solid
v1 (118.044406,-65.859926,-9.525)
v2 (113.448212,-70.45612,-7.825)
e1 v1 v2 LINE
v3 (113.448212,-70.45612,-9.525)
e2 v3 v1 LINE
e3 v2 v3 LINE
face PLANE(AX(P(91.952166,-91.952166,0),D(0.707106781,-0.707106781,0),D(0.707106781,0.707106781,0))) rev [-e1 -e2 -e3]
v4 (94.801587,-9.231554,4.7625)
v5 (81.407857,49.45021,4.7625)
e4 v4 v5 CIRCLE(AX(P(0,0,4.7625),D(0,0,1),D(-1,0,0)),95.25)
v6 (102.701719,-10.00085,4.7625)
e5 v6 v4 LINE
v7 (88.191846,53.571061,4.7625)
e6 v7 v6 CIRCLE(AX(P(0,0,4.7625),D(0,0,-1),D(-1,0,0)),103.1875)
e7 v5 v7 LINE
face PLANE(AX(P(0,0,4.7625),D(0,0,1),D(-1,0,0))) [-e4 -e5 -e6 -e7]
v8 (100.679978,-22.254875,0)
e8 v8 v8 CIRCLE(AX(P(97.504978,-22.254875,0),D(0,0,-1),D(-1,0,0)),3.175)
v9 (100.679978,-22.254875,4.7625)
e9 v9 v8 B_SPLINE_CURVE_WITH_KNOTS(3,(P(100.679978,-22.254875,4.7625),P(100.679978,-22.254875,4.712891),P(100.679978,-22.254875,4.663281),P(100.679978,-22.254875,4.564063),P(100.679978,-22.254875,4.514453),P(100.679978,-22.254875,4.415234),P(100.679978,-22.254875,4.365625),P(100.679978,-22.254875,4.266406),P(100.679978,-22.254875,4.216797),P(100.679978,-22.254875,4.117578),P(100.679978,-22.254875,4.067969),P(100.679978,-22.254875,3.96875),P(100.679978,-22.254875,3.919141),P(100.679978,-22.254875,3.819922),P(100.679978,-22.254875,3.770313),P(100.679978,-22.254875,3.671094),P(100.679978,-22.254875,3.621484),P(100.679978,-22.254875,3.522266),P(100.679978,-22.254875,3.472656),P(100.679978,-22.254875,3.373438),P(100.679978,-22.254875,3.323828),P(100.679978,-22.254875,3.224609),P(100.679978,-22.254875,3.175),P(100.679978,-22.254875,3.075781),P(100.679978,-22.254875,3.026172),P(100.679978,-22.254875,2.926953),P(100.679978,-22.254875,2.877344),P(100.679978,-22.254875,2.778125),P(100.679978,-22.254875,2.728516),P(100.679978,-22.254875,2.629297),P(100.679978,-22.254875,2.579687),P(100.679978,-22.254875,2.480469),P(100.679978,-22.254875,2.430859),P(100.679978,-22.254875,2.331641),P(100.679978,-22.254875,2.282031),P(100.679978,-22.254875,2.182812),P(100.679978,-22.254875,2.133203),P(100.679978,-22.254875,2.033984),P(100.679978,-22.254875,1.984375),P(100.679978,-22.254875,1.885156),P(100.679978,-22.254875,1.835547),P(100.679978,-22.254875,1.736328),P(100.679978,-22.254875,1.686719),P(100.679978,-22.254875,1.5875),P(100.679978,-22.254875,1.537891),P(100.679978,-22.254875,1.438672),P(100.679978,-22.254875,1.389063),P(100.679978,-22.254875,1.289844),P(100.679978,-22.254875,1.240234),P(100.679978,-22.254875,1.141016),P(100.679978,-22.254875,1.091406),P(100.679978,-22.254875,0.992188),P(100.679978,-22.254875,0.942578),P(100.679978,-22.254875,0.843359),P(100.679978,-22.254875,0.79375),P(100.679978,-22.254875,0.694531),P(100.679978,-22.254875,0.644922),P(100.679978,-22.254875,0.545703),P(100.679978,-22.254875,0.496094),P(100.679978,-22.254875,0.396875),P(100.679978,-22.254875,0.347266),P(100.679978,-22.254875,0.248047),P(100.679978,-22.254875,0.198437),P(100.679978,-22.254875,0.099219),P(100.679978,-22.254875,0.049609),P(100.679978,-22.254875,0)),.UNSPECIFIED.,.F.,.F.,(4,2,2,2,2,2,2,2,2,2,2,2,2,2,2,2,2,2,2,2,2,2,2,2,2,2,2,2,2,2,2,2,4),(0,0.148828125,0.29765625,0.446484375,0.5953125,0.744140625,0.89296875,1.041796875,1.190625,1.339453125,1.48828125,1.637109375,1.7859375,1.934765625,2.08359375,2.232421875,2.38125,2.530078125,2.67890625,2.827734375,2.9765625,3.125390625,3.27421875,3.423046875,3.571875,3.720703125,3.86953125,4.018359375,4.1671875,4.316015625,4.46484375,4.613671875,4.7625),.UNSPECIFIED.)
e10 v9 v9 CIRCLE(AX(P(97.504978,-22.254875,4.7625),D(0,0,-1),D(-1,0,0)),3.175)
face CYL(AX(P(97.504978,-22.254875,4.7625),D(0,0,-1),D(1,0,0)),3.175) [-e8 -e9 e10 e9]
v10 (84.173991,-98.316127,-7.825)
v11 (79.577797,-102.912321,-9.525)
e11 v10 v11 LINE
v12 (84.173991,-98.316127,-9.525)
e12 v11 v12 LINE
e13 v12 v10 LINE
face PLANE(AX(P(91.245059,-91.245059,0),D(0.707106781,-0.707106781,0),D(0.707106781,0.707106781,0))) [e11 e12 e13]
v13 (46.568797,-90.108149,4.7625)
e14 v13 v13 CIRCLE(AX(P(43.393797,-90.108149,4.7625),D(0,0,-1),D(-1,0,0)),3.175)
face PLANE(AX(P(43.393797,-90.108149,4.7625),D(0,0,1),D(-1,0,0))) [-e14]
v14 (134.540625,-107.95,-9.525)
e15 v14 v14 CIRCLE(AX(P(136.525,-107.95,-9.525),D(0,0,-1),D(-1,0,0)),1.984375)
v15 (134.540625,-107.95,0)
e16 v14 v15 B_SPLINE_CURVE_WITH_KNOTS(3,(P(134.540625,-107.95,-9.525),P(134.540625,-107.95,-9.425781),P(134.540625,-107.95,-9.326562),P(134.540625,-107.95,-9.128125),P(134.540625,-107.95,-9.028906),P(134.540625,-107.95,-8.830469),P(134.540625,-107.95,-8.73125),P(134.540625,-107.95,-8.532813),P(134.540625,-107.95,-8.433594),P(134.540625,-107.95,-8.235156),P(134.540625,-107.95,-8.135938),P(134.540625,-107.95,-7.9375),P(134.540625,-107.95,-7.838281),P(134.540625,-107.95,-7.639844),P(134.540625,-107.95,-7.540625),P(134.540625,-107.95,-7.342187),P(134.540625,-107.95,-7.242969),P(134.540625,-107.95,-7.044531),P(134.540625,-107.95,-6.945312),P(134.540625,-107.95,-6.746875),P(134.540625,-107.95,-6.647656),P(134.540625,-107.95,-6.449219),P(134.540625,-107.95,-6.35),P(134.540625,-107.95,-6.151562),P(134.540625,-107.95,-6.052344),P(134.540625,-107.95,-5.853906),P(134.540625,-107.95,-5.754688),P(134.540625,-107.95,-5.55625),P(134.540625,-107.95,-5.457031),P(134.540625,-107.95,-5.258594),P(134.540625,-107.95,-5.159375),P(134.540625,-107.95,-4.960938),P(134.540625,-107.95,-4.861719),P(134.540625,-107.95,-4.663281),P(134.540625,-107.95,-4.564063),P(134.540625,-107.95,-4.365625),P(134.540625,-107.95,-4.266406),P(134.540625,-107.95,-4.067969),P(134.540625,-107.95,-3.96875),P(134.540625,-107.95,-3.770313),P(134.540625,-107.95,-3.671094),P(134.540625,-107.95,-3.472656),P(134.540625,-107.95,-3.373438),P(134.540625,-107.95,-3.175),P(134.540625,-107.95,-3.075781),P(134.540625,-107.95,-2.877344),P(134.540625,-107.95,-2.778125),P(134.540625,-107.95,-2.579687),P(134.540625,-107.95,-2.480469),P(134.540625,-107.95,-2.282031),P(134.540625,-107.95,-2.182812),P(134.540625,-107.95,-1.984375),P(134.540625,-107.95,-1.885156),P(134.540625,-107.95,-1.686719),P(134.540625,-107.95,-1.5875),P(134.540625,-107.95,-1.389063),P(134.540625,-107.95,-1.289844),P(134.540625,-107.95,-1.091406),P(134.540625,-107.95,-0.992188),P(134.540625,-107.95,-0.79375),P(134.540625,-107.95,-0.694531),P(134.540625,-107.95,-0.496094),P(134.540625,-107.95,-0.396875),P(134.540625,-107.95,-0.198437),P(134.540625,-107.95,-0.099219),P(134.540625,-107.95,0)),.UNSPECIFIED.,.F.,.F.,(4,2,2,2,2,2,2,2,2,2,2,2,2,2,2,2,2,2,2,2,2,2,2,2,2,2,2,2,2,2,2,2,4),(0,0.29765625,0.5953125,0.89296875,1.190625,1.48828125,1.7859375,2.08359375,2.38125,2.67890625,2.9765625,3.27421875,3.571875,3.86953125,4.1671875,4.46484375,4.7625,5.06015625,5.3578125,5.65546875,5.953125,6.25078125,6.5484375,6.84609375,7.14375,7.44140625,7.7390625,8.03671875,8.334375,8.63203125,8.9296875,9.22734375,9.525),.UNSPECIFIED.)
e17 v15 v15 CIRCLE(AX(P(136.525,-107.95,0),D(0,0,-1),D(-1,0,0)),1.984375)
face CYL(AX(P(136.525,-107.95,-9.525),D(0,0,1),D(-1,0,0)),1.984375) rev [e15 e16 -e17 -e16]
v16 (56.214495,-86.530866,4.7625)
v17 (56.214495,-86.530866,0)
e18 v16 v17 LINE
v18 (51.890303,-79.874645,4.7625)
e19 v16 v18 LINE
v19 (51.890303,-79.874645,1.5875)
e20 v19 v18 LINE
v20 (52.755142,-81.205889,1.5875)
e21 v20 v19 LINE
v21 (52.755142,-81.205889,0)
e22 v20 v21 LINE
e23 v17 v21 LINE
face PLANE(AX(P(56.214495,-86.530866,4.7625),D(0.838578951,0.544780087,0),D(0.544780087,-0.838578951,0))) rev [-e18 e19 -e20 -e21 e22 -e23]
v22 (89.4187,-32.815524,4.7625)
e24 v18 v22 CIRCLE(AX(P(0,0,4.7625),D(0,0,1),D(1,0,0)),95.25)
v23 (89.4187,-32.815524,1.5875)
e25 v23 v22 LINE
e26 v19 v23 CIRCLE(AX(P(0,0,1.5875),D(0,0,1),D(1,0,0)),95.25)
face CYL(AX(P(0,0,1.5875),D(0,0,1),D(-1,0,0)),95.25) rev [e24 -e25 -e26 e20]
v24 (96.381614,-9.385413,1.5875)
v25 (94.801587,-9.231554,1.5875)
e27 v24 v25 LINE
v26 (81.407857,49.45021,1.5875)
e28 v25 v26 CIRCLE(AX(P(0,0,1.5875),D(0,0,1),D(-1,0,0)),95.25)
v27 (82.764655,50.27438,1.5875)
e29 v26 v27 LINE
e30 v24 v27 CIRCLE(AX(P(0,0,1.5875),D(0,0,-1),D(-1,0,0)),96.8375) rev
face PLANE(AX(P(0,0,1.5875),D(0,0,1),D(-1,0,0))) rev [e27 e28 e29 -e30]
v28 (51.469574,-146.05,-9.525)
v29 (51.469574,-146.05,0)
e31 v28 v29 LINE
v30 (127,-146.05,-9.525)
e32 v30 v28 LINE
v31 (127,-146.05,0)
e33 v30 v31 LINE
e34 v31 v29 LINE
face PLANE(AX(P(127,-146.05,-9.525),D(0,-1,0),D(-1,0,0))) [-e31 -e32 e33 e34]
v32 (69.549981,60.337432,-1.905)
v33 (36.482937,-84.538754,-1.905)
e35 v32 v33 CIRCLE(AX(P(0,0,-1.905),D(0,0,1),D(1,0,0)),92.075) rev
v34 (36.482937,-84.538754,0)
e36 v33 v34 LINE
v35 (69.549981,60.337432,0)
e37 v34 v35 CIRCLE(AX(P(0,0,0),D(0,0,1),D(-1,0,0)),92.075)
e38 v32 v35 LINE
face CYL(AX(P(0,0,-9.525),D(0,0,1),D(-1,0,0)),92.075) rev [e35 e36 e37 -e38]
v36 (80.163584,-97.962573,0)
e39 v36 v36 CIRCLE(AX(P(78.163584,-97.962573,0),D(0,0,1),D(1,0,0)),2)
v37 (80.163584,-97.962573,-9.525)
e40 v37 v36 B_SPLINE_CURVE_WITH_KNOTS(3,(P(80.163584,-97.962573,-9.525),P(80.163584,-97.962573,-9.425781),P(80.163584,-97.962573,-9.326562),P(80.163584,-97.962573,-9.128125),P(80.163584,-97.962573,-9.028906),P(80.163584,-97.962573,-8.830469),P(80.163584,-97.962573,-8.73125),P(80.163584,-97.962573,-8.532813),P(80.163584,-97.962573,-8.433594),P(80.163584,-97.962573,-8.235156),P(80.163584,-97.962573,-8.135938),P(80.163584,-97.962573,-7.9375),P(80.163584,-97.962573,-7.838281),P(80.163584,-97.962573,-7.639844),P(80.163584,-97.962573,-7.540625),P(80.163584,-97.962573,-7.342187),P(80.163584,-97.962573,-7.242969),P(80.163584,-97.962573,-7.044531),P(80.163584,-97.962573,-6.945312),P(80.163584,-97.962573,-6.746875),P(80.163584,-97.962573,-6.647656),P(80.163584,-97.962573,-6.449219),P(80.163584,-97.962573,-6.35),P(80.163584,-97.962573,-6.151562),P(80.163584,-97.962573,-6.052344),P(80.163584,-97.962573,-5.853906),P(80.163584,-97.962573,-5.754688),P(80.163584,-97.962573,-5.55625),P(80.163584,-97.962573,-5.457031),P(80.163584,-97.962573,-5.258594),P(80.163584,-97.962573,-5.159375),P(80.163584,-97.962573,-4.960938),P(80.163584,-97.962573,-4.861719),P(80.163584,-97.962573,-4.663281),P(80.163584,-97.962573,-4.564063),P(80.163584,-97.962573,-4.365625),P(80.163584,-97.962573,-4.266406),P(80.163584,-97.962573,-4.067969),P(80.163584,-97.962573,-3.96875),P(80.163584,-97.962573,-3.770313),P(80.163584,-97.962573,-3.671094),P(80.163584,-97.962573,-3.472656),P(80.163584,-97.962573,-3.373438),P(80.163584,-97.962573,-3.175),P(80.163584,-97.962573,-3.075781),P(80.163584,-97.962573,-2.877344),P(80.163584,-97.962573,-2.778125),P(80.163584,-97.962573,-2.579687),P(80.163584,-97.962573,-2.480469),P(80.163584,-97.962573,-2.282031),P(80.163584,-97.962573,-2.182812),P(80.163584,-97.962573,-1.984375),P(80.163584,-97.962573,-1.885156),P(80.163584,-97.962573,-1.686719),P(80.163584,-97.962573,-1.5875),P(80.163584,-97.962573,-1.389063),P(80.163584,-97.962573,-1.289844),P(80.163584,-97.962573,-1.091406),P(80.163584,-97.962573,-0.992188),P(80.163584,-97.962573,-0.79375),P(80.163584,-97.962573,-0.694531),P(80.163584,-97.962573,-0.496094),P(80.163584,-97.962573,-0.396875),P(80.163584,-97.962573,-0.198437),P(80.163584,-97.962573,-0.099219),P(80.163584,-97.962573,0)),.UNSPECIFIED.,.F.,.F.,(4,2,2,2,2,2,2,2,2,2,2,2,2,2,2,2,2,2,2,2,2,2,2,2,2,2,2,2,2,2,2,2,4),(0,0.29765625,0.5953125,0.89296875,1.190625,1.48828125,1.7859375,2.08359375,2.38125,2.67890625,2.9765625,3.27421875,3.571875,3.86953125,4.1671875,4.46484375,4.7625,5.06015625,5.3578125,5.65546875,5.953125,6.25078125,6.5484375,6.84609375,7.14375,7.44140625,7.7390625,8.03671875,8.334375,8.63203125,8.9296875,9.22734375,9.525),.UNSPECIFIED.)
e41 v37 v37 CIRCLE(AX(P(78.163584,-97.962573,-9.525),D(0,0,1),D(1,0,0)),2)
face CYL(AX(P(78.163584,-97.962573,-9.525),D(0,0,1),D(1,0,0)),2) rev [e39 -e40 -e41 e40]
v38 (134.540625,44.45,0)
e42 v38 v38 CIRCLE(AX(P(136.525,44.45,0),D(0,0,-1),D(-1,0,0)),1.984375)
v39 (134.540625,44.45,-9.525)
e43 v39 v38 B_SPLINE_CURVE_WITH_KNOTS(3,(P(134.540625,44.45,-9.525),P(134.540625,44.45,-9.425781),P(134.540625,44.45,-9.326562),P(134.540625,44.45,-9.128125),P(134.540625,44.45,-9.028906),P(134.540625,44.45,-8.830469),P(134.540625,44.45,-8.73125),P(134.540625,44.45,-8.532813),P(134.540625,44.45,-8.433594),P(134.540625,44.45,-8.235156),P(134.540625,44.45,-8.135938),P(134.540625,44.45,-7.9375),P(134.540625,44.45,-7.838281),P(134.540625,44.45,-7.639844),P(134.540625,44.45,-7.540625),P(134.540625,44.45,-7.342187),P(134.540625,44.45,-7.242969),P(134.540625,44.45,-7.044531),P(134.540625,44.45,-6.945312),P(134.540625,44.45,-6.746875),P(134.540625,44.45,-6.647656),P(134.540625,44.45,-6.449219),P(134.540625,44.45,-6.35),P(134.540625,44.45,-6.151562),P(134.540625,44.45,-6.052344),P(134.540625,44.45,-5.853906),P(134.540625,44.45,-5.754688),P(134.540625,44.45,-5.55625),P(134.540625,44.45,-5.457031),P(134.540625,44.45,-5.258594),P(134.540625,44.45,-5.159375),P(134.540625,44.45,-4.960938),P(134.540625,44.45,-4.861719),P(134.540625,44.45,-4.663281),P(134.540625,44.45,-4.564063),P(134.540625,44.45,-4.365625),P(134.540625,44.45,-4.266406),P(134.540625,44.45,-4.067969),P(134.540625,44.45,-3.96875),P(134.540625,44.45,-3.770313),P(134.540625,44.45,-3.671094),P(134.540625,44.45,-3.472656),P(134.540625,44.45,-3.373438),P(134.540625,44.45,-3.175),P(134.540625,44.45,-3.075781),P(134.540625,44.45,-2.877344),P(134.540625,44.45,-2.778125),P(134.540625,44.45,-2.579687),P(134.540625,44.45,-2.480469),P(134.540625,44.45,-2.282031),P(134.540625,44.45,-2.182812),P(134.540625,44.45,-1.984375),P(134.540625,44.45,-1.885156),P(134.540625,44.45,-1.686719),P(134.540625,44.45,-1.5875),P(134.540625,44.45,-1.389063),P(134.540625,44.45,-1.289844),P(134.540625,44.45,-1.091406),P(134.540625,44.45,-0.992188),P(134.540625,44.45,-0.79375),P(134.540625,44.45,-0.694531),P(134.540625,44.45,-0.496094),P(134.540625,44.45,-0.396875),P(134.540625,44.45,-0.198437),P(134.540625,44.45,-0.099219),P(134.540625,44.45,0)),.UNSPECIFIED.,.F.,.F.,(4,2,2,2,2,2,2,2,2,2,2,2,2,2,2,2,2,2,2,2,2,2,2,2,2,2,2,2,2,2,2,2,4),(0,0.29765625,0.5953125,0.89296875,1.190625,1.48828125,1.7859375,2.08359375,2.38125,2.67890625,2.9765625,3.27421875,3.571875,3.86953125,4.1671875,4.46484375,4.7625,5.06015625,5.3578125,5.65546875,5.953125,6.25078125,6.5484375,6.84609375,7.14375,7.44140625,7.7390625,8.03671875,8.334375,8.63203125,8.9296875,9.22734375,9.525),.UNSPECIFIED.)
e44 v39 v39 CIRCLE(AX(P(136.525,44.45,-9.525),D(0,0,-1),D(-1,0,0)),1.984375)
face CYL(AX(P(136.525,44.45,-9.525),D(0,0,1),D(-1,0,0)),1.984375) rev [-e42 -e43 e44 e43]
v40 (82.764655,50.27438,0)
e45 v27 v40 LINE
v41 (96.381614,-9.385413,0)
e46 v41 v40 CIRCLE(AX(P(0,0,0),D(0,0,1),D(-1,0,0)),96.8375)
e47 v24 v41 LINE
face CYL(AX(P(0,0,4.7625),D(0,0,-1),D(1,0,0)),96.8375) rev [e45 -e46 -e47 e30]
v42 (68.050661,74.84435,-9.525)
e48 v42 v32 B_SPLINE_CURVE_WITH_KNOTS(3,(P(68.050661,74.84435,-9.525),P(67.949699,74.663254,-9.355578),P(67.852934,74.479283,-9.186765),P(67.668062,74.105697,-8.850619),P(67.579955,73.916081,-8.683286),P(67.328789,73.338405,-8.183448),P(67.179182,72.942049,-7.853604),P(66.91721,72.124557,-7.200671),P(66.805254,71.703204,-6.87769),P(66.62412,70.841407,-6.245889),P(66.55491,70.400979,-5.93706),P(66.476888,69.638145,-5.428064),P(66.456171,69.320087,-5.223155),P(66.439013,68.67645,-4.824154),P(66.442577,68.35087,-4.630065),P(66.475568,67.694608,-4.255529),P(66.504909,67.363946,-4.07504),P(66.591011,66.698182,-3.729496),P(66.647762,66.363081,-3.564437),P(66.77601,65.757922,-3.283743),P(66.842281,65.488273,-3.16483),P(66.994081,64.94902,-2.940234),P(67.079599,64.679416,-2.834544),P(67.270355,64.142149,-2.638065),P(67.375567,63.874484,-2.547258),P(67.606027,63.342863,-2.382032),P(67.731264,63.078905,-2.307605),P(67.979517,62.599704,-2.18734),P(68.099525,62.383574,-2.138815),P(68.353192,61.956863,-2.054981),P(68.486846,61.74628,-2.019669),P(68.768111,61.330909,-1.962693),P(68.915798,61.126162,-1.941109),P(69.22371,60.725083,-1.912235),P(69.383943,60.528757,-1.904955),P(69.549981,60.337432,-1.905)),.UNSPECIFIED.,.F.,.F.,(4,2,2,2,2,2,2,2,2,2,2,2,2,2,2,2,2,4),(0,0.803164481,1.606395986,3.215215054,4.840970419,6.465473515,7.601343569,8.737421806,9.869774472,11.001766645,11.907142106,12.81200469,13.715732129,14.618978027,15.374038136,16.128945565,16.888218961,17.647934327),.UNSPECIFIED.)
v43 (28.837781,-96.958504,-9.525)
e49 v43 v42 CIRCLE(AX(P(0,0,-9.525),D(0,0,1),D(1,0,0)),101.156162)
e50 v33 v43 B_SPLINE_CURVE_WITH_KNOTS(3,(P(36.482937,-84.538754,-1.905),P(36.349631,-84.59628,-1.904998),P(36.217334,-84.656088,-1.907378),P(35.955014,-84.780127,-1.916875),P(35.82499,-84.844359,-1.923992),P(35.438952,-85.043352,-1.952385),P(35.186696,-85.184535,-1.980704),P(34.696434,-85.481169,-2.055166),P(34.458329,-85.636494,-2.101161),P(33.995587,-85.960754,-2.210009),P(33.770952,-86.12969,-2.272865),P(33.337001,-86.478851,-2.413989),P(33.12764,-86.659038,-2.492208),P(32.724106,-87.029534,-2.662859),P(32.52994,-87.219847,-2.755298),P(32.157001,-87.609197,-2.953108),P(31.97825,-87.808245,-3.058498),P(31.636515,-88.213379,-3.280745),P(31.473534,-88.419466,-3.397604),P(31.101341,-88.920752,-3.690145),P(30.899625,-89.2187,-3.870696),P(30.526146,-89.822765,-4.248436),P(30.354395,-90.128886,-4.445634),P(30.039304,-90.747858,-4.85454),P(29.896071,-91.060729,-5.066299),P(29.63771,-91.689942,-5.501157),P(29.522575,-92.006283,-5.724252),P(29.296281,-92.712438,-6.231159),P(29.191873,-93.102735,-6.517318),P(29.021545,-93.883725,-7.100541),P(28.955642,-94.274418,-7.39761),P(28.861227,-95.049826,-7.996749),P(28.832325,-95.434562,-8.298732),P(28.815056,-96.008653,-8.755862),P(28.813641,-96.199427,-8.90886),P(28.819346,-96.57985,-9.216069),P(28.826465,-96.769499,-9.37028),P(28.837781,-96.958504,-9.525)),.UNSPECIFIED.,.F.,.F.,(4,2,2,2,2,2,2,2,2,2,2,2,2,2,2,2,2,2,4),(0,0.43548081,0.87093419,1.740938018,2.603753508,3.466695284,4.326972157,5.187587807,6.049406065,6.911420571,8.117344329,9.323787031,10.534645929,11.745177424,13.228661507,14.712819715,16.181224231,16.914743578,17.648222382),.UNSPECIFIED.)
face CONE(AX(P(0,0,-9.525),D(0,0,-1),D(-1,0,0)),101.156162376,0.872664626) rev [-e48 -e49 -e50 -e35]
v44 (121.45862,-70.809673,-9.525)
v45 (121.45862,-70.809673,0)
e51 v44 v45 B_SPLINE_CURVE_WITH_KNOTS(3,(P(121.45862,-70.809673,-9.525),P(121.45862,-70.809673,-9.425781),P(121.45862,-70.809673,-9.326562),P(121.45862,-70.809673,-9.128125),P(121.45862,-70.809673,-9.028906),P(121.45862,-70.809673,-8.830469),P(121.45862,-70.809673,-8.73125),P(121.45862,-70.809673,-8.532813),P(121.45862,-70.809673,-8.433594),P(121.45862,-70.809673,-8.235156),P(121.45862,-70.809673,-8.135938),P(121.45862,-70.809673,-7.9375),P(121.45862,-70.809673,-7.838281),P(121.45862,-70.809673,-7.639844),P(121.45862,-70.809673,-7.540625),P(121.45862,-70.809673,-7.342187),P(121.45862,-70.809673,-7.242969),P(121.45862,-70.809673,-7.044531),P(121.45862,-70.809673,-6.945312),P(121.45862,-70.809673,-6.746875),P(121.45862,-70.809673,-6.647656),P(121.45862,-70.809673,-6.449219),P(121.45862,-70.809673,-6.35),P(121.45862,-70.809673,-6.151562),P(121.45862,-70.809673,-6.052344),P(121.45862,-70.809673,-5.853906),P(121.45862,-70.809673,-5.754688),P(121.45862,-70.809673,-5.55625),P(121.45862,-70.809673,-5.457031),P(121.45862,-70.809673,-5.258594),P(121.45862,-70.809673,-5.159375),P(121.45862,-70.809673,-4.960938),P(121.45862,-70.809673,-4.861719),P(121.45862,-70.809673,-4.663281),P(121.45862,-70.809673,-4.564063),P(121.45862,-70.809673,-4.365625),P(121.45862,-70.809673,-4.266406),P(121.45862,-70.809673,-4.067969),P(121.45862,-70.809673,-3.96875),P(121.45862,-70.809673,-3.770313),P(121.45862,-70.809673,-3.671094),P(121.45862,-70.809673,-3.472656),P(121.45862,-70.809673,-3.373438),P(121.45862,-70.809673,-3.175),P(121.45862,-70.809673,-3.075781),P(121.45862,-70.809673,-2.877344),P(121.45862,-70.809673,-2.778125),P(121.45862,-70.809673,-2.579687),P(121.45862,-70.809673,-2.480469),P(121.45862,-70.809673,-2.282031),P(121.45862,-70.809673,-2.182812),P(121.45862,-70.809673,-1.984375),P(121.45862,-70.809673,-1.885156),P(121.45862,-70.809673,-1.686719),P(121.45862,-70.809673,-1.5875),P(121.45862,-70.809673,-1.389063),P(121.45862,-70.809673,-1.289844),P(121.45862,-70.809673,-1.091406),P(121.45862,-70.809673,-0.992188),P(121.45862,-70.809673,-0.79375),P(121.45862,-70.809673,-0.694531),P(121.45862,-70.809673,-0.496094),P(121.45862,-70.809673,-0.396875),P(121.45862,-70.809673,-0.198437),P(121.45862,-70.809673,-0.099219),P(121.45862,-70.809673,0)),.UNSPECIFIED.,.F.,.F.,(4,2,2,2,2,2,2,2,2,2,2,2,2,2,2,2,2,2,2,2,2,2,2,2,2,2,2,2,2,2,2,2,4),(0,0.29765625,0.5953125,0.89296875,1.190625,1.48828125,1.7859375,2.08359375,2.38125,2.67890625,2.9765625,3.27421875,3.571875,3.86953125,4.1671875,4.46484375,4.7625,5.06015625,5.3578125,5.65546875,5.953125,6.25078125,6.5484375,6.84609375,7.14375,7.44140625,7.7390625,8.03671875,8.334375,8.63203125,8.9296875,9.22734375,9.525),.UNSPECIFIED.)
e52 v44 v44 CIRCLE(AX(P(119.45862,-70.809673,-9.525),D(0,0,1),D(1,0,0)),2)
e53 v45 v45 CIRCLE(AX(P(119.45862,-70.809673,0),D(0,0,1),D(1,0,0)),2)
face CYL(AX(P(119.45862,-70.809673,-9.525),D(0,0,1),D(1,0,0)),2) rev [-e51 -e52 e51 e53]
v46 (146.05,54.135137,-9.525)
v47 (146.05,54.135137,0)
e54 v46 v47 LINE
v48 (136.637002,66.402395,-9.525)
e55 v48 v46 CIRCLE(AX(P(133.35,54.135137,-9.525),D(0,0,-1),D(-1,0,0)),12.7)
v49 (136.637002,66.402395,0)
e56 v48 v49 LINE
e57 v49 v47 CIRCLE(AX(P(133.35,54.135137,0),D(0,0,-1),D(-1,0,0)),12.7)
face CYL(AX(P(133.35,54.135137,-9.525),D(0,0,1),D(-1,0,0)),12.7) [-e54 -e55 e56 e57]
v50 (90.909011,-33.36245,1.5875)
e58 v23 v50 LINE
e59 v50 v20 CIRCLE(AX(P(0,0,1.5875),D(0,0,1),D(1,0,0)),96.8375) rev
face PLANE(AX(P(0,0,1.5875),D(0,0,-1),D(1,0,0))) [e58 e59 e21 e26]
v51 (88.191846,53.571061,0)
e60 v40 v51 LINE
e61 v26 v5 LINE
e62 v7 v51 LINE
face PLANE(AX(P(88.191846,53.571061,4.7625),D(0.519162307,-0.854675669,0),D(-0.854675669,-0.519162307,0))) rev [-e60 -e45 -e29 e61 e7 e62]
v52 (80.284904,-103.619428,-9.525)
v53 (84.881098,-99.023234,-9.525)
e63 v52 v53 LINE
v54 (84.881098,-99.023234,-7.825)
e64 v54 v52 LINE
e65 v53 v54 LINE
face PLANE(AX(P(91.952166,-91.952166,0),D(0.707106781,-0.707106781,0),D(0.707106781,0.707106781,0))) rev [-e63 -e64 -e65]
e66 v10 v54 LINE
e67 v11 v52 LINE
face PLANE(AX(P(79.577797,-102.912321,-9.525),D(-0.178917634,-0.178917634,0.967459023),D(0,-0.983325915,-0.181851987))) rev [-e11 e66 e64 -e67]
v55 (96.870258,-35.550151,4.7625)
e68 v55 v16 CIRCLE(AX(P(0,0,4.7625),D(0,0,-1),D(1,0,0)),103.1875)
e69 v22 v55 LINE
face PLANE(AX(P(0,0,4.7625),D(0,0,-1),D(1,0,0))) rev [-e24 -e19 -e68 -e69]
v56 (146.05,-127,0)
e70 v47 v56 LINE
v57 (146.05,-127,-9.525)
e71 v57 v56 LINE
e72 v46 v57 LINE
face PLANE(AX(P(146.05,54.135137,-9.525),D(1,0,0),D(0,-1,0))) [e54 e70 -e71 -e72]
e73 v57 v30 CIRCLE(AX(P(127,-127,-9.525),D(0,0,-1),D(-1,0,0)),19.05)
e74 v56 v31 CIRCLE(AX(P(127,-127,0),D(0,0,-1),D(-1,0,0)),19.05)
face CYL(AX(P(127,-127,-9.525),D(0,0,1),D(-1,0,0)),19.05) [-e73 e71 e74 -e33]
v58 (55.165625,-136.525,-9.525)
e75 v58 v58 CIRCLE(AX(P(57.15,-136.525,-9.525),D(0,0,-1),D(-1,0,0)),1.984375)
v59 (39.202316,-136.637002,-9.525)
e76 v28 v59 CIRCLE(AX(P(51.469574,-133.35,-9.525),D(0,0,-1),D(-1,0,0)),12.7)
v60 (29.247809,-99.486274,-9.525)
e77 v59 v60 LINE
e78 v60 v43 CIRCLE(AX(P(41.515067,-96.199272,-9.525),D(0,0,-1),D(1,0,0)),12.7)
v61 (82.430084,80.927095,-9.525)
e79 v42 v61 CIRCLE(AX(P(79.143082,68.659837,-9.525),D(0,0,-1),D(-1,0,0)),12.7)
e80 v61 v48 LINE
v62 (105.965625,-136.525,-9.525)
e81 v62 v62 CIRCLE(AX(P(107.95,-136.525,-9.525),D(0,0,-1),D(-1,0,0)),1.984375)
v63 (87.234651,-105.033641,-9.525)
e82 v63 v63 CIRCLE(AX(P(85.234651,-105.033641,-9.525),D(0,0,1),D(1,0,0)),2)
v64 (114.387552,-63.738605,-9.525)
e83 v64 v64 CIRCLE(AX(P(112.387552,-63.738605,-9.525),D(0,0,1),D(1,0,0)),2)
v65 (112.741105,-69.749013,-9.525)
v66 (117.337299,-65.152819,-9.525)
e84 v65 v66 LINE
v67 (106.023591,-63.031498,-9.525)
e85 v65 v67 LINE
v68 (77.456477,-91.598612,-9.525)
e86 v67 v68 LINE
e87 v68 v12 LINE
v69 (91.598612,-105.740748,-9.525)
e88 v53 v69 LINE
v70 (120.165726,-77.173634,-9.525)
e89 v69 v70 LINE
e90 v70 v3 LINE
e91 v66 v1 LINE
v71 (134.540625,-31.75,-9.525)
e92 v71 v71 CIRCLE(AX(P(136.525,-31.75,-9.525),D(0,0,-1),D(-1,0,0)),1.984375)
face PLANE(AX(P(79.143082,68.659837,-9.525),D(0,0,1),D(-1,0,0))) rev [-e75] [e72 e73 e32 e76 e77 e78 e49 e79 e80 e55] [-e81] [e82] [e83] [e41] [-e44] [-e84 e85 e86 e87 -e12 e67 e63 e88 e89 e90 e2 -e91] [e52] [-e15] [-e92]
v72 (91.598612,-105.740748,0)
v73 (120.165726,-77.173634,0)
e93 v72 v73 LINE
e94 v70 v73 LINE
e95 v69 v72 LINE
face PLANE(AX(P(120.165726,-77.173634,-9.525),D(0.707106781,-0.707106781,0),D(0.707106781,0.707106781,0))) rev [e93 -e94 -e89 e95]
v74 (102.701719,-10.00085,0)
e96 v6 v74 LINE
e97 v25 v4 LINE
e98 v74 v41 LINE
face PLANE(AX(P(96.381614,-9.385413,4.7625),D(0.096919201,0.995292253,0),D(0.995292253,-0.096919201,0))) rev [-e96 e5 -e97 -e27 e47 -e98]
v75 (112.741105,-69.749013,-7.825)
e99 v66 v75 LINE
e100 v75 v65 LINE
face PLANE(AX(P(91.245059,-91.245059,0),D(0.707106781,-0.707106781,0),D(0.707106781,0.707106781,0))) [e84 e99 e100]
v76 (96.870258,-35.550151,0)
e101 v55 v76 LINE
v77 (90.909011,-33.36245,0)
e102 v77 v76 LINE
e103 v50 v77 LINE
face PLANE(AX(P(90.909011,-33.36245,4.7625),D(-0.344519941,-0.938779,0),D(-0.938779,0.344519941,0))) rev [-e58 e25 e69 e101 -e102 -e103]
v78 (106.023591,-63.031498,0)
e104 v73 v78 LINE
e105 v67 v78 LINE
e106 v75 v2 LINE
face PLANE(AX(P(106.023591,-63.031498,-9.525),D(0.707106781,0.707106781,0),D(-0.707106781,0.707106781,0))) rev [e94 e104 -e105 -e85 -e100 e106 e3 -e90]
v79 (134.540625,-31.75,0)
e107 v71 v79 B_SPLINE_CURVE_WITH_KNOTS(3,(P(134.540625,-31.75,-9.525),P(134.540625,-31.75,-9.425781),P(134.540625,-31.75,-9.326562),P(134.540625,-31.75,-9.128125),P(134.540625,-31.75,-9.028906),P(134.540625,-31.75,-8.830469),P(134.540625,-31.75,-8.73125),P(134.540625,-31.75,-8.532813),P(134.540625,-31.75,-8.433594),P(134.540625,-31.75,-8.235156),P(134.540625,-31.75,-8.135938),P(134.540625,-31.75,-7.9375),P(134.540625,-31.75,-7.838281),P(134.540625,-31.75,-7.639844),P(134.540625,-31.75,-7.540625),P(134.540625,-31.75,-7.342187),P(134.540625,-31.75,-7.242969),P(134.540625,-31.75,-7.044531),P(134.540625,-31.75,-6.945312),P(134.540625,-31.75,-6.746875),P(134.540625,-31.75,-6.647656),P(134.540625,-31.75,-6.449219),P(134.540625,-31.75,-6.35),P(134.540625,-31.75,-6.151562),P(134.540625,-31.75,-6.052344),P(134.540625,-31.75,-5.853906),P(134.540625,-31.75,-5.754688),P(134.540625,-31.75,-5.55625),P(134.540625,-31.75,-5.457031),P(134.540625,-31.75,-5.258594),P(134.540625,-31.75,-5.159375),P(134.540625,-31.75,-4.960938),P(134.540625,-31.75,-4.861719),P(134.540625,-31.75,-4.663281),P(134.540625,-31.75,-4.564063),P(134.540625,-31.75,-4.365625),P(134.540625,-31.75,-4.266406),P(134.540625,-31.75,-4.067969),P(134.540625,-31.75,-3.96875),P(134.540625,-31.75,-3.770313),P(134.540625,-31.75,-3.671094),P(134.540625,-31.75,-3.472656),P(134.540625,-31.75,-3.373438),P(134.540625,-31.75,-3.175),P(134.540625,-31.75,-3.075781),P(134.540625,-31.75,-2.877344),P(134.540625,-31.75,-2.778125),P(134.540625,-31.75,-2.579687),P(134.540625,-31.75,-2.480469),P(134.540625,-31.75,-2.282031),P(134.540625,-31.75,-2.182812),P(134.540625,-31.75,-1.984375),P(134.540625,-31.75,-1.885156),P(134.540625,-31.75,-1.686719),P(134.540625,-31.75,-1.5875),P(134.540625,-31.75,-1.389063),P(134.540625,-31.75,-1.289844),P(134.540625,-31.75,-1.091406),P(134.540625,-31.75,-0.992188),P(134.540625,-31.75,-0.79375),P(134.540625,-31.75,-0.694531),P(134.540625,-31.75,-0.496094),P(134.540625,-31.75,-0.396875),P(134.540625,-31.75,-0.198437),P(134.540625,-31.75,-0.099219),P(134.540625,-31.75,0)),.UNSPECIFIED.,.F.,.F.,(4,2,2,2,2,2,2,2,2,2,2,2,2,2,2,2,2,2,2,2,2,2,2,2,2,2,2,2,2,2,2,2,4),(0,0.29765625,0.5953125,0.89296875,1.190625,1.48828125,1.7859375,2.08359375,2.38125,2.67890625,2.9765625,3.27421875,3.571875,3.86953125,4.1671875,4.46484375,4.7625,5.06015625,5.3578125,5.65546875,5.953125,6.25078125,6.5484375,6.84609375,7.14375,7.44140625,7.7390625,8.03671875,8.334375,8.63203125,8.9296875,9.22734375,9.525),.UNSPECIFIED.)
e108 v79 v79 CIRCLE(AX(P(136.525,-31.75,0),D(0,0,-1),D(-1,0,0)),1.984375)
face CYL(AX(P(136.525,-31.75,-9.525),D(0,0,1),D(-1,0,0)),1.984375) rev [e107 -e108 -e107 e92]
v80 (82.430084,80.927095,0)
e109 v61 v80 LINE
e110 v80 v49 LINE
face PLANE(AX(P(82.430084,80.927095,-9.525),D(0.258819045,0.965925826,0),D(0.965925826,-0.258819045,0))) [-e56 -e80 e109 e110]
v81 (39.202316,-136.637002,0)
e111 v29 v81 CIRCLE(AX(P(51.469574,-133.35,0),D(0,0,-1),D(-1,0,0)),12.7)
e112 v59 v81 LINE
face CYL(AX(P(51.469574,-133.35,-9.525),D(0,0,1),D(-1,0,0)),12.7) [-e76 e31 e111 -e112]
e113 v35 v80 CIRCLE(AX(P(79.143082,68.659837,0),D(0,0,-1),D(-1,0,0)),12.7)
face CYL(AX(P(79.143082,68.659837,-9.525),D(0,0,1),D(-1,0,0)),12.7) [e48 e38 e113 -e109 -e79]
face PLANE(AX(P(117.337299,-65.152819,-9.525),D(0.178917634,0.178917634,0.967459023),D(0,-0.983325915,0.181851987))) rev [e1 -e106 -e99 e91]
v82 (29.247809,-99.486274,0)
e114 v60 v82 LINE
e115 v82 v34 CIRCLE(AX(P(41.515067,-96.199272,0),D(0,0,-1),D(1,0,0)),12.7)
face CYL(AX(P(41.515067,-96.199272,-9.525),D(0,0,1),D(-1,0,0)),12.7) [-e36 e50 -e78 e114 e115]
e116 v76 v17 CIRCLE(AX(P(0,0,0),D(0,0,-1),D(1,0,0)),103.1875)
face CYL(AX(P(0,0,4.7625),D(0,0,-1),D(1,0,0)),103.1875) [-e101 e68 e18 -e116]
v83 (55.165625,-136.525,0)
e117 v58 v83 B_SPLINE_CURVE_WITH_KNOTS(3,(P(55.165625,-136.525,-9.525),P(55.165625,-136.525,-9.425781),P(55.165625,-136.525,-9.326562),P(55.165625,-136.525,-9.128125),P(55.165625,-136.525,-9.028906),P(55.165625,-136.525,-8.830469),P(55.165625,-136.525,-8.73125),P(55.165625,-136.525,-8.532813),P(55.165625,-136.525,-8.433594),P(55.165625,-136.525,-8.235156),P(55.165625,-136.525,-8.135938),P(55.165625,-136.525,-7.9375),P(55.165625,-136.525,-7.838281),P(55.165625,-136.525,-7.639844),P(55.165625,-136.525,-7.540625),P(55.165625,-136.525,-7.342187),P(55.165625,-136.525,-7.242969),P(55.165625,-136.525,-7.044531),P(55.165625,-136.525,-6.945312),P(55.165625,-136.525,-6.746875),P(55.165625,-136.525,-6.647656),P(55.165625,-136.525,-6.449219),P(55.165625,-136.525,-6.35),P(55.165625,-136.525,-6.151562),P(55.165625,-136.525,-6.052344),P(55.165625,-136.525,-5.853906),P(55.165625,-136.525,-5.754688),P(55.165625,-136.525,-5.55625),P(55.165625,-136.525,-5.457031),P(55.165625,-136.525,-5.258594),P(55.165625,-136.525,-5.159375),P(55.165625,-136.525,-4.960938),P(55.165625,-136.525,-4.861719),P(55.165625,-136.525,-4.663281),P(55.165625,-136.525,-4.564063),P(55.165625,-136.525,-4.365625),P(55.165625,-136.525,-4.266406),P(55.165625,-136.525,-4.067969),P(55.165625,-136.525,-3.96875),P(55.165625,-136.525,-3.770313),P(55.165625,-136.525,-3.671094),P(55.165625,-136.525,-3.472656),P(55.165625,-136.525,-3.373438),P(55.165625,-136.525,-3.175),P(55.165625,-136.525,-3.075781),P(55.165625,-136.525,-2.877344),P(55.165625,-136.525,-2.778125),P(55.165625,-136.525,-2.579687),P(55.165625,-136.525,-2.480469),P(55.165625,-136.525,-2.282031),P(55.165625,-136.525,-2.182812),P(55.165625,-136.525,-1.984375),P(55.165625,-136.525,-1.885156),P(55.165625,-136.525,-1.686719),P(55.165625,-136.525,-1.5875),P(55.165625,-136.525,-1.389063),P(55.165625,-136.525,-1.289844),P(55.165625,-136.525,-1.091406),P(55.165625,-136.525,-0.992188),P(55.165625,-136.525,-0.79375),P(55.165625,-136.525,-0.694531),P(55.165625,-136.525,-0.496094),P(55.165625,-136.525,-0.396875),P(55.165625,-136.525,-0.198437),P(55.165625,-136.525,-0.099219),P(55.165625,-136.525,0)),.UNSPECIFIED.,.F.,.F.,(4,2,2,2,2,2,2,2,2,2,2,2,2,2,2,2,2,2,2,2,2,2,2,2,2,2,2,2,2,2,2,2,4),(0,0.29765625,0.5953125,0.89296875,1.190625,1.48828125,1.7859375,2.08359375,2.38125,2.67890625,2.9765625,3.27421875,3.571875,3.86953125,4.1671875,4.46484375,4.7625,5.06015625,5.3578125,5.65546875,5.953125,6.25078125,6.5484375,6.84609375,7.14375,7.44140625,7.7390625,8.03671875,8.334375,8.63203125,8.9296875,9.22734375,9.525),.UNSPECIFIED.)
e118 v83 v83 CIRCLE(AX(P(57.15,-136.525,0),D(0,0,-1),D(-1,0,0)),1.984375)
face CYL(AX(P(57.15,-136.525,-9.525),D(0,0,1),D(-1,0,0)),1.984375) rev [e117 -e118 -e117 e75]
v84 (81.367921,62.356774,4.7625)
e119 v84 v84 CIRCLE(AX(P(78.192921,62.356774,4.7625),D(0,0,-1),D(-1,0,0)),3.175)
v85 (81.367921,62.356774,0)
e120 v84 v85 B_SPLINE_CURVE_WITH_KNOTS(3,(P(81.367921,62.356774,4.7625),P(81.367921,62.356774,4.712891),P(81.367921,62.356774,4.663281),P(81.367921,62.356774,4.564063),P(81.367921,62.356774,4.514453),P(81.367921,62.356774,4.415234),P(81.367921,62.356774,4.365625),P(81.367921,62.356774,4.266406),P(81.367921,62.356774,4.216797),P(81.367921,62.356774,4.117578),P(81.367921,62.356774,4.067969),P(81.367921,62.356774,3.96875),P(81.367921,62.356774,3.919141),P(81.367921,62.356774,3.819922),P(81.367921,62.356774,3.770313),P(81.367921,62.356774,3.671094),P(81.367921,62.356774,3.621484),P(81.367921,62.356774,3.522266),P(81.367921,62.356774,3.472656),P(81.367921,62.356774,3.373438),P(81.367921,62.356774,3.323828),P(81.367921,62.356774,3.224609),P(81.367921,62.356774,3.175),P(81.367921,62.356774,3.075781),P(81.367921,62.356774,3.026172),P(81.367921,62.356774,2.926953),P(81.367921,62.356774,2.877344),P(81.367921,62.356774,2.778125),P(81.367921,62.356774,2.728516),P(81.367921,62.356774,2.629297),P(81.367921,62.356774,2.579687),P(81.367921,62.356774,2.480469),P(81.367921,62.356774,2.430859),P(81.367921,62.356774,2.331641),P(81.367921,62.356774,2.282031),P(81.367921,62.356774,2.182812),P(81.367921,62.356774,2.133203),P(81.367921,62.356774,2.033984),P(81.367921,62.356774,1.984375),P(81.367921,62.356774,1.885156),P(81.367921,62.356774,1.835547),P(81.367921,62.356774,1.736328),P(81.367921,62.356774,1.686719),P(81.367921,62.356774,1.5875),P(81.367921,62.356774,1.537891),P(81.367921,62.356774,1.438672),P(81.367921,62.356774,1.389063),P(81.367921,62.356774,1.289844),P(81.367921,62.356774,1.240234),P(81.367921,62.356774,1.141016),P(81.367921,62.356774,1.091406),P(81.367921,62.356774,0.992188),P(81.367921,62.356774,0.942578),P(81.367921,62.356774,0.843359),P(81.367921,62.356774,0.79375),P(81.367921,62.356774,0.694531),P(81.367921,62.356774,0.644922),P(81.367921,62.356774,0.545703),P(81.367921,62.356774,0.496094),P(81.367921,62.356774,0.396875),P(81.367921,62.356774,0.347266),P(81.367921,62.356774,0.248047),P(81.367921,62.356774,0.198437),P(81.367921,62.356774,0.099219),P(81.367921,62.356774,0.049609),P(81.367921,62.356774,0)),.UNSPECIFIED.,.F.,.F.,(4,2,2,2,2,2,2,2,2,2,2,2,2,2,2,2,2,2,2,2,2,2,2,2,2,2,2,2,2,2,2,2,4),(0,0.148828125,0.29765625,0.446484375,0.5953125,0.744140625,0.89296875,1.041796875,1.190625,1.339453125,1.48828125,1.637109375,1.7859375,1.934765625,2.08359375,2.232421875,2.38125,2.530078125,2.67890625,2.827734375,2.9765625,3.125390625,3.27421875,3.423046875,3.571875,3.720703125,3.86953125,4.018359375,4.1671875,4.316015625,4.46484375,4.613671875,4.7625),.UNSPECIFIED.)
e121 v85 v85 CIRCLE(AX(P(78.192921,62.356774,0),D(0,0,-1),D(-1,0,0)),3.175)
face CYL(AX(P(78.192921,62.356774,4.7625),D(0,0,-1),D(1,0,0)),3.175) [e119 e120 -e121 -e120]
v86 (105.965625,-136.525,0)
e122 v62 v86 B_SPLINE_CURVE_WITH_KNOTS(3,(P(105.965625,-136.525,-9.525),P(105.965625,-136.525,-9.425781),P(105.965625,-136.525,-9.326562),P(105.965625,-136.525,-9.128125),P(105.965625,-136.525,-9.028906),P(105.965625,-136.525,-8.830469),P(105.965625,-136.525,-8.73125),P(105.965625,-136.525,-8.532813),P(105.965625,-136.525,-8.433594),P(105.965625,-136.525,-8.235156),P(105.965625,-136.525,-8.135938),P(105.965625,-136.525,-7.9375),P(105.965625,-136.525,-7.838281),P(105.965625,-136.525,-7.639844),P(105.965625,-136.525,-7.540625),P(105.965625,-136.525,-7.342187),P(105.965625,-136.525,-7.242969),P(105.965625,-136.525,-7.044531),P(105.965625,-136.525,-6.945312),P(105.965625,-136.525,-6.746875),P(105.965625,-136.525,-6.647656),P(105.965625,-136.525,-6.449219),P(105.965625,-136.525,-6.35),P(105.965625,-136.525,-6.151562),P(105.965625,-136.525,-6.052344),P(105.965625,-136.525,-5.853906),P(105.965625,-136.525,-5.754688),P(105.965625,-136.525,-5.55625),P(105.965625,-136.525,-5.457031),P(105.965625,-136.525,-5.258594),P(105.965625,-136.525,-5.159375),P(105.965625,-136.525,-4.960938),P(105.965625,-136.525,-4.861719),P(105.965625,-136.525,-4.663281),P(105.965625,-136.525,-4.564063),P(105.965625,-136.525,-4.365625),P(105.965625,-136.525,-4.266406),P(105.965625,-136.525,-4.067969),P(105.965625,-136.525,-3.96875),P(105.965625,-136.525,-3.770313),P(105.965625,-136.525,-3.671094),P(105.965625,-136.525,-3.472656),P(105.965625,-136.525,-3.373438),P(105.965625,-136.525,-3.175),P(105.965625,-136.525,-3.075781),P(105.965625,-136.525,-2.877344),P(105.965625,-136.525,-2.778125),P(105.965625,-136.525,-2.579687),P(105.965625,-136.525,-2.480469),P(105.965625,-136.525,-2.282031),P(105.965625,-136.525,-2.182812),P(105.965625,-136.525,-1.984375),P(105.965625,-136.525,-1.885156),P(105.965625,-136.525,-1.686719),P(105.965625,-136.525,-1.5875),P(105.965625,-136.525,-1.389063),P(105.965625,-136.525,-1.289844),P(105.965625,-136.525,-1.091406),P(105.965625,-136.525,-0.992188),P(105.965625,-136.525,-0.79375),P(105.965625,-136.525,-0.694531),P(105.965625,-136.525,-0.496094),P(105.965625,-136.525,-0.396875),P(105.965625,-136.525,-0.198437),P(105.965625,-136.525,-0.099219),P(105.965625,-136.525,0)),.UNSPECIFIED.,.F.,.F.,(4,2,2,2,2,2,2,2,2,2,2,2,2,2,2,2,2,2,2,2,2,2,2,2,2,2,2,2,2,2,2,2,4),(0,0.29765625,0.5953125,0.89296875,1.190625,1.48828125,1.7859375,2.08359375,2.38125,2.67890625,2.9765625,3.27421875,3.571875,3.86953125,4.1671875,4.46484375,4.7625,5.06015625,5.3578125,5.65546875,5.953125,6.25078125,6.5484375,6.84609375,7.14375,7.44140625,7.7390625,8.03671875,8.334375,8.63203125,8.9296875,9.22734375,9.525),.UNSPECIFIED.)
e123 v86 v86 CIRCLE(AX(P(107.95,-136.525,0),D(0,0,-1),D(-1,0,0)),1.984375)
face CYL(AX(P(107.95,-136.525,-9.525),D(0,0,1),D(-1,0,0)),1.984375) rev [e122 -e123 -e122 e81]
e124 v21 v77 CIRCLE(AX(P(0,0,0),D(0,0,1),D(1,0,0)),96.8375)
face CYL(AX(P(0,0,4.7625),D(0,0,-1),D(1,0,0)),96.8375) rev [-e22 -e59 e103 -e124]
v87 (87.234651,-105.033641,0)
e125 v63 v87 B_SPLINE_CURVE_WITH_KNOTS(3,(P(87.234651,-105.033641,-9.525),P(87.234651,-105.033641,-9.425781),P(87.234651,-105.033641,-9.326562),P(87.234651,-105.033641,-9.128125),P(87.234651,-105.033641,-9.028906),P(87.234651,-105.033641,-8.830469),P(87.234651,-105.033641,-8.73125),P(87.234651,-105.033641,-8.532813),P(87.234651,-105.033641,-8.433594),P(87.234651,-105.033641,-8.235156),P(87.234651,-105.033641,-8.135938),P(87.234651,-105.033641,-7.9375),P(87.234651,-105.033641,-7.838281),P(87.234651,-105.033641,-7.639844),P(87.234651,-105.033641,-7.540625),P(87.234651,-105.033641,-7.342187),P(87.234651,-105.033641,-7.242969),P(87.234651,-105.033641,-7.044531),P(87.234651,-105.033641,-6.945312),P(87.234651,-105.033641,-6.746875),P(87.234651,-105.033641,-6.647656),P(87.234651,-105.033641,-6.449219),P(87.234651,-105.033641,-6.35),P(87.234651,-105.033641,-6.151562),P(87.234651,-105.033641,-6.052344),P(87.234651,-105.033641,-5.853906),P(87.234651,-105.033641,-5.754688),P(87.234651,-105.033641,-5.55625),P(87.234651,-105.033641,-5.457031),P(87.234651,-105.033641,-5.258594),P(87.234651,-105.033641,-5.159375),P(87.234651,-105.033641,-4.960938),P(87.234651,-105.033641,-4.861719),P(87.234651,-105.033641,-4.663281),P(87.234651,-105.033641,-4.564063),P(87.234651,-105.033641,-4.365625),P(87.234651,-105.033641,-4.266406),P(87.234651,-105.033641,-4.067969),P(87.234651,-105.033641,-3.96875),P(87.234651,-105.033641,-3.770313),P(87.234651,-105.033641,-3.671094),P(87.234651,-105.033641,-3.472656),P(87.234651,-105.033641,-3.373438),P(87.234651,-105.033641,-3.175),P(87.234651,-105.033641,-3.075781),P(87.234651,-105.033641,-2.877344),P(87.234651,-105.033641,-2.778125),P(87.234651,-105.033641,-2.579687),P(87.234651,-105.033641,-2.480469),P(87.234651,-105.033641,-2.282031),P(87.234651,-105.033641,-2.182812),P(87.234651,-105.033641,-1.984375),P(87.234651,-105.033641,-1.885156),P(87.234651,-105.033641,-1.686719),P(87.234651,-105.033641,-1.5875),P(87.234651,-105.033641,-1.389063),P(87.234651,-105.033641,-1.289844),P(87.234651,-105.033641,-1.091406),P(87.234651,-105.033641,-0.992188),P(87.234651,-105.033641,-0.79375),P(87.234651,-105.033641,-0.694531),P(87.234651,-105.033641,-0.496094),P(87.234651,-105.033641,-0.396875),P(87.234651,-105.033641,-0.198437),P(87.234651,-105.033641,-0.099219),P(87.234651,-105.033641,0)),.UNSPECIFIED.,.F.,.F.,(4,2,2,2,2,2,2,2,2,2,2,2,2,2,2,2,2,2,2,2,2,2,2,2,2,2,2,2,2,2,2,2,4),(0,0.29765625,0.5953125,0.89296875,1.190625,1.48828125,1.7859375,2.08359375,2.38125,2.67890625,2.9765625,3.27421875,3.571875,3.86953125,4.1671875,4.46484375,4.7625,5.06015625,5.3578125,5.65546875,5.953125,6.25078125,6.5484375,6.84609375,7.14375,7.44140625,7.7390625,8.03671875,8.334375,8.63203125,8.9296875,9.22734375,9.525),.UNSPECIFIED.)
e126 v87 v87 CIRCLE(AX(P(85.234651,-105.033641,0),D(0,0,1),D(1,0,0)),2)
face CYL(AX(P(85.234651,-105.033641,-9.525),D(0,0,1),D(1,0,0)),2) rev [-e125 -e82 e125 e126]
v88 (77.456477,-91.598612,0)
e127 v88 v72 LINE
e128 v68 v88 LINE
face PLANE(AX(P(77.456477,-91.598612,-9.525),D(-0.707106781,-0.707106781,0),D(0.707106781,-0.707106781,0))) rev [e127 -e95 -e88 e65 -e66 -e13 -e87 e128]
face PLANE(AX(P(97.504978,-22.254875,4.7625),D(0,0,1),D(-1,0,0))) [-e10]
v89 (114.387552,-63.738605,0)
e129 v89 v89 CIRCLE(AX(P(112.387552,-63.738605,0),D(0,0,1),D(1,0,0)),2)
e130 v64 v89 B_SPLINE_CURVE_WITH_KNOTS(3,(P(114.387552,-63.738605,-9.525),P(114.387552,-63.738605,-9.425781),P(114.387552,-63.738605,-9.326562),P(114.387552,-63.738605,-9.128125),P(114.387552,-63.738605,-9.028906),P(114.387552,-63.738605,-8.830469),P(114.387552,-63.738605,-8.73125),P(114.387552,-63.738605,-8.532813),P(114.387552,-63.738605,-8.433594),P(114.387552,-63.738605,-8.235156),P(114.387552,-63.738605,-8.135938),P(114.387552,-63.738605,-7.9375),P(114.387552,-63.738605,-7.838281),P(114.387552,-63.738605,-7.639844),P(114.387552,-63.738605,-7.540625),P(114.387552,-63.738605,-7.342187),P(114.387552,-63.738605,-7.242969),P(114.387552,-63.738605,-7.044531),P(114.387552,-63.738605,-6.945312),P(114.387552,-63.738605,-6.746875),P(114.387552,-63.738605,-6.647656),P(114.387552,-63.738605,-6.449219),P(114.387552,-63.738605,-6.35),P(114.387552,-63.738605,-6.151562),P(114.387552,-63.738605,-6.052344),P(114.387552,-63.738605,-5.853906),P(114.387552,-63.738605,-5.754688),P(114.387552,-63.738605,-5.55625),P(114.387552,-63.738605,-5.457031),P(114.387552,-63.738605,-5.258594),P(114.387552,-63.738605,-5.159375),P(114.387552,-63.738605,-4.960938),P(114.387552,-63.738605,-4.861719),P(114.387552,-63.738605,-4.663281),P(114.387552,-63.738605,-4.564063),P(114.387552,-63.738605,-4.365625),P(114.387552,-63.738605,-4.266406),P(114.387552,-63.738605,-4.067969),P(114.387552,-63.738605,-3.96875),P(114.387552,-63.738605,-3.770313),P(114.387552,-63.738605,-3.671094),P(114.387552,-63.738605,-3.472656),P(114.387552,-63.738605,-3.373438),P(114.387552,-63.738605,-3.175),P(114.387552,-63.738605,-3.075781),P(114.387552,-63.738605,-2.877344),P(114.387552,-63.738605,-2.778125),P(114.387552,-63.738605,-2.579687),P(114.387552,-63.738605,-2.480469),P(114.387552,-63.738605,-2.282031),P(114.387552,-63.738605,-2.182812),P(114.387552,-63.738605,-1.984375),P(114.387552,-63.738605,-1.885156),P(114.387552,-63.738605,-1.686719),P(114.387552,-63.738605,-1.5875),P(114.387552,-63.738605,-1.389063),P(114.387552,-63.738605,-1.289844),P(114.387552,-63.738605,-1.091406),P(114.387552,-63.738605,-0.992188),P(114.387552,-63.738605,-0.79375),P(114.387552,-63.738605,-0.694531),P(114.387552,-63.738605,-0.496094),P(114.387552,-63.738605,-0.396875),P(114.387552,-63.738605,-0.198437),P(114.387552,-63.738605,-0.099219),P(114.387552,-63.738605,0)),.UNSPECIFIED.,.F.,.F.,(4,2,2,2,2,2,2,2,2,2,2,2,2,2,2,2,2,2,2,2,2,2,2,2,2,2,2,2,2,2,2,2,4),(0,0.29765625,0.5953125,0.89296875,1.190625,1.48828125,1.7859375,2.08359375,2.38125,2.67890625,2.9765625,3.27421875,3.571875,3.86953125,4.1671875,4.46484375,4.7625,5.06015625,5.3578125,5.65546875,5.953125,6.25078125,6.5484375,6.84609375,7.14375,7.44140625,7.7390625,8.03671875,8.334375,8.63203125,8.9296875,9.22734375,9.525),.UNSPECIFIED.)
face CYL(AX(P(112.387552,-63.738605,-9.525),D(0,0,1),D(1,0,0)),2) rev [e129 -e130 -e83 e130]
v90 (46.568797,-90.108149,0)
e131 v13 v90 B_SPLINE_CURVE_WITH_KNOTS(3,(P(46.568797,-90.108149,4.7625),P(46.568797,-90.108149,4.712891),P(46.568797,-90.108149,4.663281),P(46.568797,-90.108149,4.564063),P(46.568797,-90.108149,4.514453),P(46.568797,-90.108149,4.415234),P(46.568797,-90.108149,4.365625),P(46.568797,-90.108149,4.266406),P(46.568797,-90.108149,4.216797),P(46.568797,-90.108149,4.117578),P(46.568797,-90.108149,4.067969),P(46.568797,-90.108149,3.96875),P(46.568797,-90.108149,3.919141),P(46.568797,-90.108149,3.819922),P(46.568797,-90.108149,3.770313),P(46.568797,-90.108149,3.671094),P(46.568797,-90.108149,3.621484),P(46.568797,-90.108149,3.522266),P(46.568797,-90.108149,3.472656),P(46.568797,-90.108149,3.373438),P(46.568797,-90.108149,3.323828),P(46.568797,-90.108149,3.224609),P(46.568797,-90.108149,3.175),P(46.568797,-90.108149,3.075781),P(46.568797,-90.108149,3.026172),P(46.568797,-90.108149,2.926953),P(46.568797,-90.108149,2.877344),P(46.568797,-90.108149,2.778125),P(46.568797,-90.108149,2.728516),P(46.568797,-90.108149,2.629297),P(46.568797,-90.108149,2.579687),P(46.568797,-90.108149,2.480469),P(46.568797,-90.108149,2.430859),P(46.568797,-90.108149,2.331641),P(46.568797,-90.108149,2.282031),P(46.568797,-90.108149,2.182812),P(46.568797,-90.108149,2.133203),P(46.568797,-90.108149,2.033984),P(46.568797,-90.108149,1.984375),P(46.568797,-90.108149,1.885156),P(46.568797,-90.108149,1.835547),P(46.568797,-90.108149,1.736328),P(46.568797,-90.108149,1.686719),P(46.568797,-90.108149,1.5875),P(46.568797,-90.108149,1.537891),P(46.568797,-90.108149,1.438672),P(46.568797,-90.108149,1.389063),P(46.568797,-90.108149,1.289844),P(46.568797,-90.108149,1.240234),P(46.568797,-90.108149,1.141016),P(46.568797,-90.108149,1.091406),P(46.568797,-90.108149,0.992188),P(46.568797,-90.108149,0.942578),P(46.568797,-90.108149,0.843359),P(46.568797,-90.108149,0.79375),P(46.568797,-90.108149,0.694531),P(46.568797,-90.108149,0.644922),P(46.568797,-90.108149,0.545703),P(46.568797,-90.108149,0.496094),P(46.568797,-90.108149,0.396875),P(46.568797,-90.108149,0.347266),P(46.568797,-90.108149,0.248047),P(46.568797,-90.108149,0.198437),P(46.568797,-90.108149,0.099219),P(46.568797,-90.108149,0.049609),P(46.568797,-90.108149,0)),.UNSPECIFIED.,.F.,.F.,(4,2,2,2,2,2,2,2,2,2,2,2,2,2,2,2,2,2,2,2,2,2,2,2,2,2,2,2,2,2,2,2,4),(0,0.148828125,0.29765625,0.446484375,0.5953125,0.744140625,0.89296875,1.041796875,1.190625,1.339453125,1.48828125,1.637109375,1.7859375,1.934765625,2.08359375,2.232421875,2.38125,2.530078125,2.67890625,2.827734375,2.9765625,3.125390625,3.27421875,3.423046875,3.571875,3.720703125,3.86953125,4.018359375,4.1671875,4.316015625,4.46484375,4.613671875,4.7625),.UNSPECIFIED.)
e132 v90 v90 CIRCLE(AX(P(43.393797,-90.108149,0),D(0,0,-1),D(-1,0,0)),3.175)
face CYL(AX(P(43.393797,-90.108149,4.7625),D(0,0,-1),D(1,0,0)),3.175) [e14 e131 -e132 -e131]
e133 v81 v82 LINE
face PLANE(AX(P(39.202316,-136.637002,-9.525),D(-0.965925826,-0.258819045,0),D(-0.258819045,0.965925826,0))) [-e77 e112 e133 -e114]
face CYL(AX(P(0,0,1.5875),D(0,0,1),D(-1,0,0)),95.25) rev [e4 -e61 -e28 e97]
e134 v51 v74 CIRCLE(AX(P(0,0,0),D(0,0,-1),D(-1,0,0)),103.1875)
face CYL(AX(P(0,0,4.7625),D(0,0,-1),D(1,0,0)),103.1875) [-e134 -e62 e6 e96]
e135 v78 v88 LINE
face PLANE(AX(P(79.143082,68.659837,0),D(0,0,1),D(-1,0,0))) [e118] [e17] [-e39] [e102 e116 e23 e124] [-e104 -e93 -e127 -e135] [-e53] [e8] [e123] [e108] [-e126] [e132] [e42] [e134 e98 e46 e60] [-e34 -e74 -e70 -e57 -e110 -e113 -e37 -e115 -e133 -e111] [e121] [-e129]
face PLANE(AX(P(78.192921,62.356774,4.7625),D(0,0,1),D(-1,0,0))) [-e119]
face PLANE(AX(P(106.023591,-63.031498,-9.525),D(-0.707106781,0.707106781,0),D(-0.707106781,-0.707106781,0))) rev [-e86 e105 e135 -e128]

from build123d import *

# Parameters (mm, degrees)
SKETCH1_R             = 3.175
BOSS_EXTRUDE1_DEPTH   = 4.7625
BOSS_EXTRUDE1_2_DEPTH = 4.7625
BOSS_EXTRUDE1_3_DEPTH = 4.7625
BOSS_EXTRUDE1_4_DEPTH = 4.7625
BOSS_EXTRUDE1_5_DEPTH = 4.7625
SKETCH2_R             = 1.984375
BOSS_EXTRUDE2_DEPTH   = 9.525
BOSS_EXTRUDE3_DEPTH   = 3.175
SKETCH5_R             = 2
CUT_EXTRUDE1_DEPTH    = 207.765399971
CUT_EXTRUDE2_DEPTH    = 0.5
CHAMFER1_SIZE         = 7.62
CHAMFER1_SIZE_2       = 9.081162376


with BuildPart() as part:
    # Sketch1 → Boss-Extrude1 (new body)
    with BuildSketch(Plane.XY):
        with Locations(Location((-78.19292114, 62.356773808, 0), (0, 0, 180))):
            Circle(SKETCH1_R)
    extrude(amount=BOSS_EXTRUDE1_DEPTH)



with BuildPart() as body_2:
    # Sketch1 → Boss-Extrude1 2 (new body)
    with BuildSketch(Plane.XY):
        with Locations(Location((-97.504977817, -22.254874907, 0), (0, 0, 180))):
            Circle(SKETCH1_R)
    extrude(amount=BOSS_EXTRUDE1_2_DEPTH)


with BuildPart() as body_3:
    # Sketch1 → Boss-Extrude1 3 (new body)
    with BuildSketch(Plane.XY):
        with Locations(Location((-43.393797458, -90.108148901, 0), (0, 0, 180))):
            Circle(SKETCH1_R)
    extrude(amount=BOSS_EXTRUDE1_3_DEPTH)


with BuildPart() as body_4:
    # Sketch1 → Boss-Extrude1 4 (new body)
    with BuildSketch(Plane.XY):
        with BuildLine():
            Line((-88.191845565, 53.571060584), (-82.764655069, 50.274379933))
            ThreePointArc((-82.764655069, 50.274379933), (-94.409581696, 21.548370942), (-96.381613527, -9.385413164))
            Line((-96.381613527, -9.385413164), (-102.701719332, -10.000850093))
            ThreePointArc((-102.701719332, -10.000850093), (-100.600373938, 22.961378873), (-88.191845565, 53.571060584))
        make_face()
    extrude(amount=BOSS_EXTRUDE1_4_DEPTH)


with BuildPart() as body_5:
    # Sketch1 → Boss-Extrude1 5 (new body)
    with BuildSketch(Plane.XY):
        with BuildLine():
            Line((-90.909011383, -33.362449786), (-96.870258031, -35.550151411))
            ThreePointArc((-96.870258031, -35.550151411), (-80.675236097, -64.336353929), (-56.214495182, -86.53086552))
            Line((-56.214495182, -86.53086552), (-52.755141633, -81.20588918))
            ThreePointArc((-52.755141633, -81.20588918), (-75.710606183, -60.377193687), (-90.909011383, -33.362449786))
        make_face()
    extrude(amount=BOSS_EXTRUDE1_5_DEPTH)


with BuildPart() as part_1:
    add(part.part)

    add(body_2.part)  # Boss-Extrude2 merges body 2

    add(body_3.part)  # Boss-Extrude2 merges body 3
    # Sketch2 → Boss-Extrude2 (add)
    with BuildSketch(Plane.XY):
        with BuildLine():
            Line((-82.430084054, 80.927094637), (-136.637001873, 66.402394783))
            ThreePointArc((-136.637001873, 66.402394783), (-143.425587422, 61.866406938), (-146.05, 54.13513679))
            Line((-146.05, 54.13513679), (-146.05, -127))
            ThreePointArc((-146.05, -127), (-140.470384182, -140.470384182), (-127, -146.05))
            Line((-127, -146.05), (-51.469574148, -146.05))
            ThreePointArc((-51.469574148, -146.05), (-43.738303999, -143.425587422), (-39.202316154, -136.637001873))
            Line((-39.202316154, -136.637001873), (-29.247808511, -99.486273586))
            ThreePointArc((-29.247808511, -99.486273586), (-30.083781104, -90.666124862), (-36.482937232, -84.53875393))
            ThreePointArc((-36.482937232, -84.53875393), (-89.766487514, -20.488614994), (-69.549981311, 60.337432202))
            ThreePointArc((-69.549981311, 60.337432202), (-68.376222335, 75.395171012), (-82.430084054, 80.927094637))
        make_face()
        with Locations((-136.525, 44.45)):
            Circle(SKETCH2_R, mode=Mode.SUBTRACT)
        with Locations((-136.525, -31.75)):
            Circle(SKETCH2_R, mode=Mode.SUBTRACT)
        with Locations((-136.525, -107.95)):
            Circle(SKETCH2_R, mode=Mode.SUBTRACT)
        with Locations((-57.15, -136.525)):
            Circle(SKETCH2_R, mode=Mode.SUBTRACT)
        with Locations((-107.95, -136.525)):
            Circle(SKETCH2_R, mode=Mode.SUBTRACT)
    extrude(amount=-BOSS_EXTRUDE2_DEPTH)


    add(body_4.part)  # Boss-Extrude3 merges body 4

    add(body_5.part)  # Boss-Extrude3 merges body 5
    # Sketch3 → Boss-Extrude3 (add)
    with BuildSketch(Plane.XY.offset(4.7625)):
        with BuildLine():
            Line((-81.407857445, 49.45020977), (-88.191845565, 53.571060584))
            ThreePointArc((-88.191845565, 53.571060584), (-100.600373938, 22.961378873), (-102.701719332, -10.000850093))
            Line((-102.701719332, -10.000850093), (-94.801587075, -9.231553932))
            ThreePointArc((-94.801587075, -9.231553932), (-92.861883635, 21.195118959), (-81.407857445, 49.45020977))
        make_face()
        with BuildLine():
            Line((-96.870258031, -35.550151411), (-89.418699721, -32.815524379))
            ThreePointArc((-89.418699721, -32.815524379), (-74.469448705, -59.387403627), (-51.890303245, -79.874645095))
            Line((-51.890303245, -79.874645095), (-56.214495182, -86.53086552))
            ThreePointArc((-56.214495182, -86.53086552), (-80.675236097, -64.336353929), (-96.870258031, -35.550151411))
        make_face()
    extrude(amount=-BOSS_EXTRUDE3_DEPTH)


with BuildPart() as body_2_2:
    # Mirror2: mirrored copy
    add(part_1.part.mirror(Plane(origin=(0, 0, 0), x_dir=(0, 0, 1), z_dir=(1, 0, 0))))

    # Sketch5 → Cut-Extrude1 (cut, through all)
    with BuildSketch(Plane.XY):
        with Locations((119.458619614, -70.809673068)):
            Circle(SKETCH5_R)
        with Locations((112.387551802, -63.738605256)):
            Circle(SKETCH5_R)
        with Locations((78.163583592, -97.962573466)):
            Circle(SKETCH5_R)
        with Locations((85.234651404, -105.033641277)):
            Circle(SKETCH5_R)
        Polygon((106.023590771, -63.031498475), (77.456476811, -91.598612435), (91.598612435, -105.740748059), (120.165726395, -77.173634099), align=None)
    extrude(amount=-CUT_EXTRUDE1_DEPTH, mode=Mode.SUBTRACT)

    # Sketch6 → Cut-Extrude2 (cut, symmetric)
    with BuildSketch(Plane(origin=(91.598612435, -91.598612435, 0), x_dir=(0, 0, -1), z_dir=(0.7071067811865488, -0.7071067811865462, 0))):
        Polygon((9.525, 30.4), (9.525, 36.9), (7.825, 30.4), align=None)
        Polygon((7.825, -10), (9.525, -10), (9.525, -16.5), align=None)
    extrude(amount=CUT_EXTRUDE2_DEPTH, both=True, mode=Mode.SUBTRACT)

    # Chamfer1
    # the kernel refuses this chamfer: 9.081162376, 7.62 mm, written as the material it takes off along each edge
    with BuildSketch(Plane(origin=(0, 0, -9.525), x_dir=(0.15246082974719, -0.9883095139645264, 0), z_dir=(-0.9883095139645264, -0.15246082974719, 0))) as chamfer1_piece_1:
        Polygon((92.075, CHAMFER1_SIZE), (92.075 + CHAMFER1_SIZE_2, 0), (92.075, 0), align=None)
    revolve(axis=Axis((0, 0, -9.525), (0, 0, 1)), revolution_arc=136.746589735, mode=Mode.SUBTRACT)


solid = body_2_2.part
